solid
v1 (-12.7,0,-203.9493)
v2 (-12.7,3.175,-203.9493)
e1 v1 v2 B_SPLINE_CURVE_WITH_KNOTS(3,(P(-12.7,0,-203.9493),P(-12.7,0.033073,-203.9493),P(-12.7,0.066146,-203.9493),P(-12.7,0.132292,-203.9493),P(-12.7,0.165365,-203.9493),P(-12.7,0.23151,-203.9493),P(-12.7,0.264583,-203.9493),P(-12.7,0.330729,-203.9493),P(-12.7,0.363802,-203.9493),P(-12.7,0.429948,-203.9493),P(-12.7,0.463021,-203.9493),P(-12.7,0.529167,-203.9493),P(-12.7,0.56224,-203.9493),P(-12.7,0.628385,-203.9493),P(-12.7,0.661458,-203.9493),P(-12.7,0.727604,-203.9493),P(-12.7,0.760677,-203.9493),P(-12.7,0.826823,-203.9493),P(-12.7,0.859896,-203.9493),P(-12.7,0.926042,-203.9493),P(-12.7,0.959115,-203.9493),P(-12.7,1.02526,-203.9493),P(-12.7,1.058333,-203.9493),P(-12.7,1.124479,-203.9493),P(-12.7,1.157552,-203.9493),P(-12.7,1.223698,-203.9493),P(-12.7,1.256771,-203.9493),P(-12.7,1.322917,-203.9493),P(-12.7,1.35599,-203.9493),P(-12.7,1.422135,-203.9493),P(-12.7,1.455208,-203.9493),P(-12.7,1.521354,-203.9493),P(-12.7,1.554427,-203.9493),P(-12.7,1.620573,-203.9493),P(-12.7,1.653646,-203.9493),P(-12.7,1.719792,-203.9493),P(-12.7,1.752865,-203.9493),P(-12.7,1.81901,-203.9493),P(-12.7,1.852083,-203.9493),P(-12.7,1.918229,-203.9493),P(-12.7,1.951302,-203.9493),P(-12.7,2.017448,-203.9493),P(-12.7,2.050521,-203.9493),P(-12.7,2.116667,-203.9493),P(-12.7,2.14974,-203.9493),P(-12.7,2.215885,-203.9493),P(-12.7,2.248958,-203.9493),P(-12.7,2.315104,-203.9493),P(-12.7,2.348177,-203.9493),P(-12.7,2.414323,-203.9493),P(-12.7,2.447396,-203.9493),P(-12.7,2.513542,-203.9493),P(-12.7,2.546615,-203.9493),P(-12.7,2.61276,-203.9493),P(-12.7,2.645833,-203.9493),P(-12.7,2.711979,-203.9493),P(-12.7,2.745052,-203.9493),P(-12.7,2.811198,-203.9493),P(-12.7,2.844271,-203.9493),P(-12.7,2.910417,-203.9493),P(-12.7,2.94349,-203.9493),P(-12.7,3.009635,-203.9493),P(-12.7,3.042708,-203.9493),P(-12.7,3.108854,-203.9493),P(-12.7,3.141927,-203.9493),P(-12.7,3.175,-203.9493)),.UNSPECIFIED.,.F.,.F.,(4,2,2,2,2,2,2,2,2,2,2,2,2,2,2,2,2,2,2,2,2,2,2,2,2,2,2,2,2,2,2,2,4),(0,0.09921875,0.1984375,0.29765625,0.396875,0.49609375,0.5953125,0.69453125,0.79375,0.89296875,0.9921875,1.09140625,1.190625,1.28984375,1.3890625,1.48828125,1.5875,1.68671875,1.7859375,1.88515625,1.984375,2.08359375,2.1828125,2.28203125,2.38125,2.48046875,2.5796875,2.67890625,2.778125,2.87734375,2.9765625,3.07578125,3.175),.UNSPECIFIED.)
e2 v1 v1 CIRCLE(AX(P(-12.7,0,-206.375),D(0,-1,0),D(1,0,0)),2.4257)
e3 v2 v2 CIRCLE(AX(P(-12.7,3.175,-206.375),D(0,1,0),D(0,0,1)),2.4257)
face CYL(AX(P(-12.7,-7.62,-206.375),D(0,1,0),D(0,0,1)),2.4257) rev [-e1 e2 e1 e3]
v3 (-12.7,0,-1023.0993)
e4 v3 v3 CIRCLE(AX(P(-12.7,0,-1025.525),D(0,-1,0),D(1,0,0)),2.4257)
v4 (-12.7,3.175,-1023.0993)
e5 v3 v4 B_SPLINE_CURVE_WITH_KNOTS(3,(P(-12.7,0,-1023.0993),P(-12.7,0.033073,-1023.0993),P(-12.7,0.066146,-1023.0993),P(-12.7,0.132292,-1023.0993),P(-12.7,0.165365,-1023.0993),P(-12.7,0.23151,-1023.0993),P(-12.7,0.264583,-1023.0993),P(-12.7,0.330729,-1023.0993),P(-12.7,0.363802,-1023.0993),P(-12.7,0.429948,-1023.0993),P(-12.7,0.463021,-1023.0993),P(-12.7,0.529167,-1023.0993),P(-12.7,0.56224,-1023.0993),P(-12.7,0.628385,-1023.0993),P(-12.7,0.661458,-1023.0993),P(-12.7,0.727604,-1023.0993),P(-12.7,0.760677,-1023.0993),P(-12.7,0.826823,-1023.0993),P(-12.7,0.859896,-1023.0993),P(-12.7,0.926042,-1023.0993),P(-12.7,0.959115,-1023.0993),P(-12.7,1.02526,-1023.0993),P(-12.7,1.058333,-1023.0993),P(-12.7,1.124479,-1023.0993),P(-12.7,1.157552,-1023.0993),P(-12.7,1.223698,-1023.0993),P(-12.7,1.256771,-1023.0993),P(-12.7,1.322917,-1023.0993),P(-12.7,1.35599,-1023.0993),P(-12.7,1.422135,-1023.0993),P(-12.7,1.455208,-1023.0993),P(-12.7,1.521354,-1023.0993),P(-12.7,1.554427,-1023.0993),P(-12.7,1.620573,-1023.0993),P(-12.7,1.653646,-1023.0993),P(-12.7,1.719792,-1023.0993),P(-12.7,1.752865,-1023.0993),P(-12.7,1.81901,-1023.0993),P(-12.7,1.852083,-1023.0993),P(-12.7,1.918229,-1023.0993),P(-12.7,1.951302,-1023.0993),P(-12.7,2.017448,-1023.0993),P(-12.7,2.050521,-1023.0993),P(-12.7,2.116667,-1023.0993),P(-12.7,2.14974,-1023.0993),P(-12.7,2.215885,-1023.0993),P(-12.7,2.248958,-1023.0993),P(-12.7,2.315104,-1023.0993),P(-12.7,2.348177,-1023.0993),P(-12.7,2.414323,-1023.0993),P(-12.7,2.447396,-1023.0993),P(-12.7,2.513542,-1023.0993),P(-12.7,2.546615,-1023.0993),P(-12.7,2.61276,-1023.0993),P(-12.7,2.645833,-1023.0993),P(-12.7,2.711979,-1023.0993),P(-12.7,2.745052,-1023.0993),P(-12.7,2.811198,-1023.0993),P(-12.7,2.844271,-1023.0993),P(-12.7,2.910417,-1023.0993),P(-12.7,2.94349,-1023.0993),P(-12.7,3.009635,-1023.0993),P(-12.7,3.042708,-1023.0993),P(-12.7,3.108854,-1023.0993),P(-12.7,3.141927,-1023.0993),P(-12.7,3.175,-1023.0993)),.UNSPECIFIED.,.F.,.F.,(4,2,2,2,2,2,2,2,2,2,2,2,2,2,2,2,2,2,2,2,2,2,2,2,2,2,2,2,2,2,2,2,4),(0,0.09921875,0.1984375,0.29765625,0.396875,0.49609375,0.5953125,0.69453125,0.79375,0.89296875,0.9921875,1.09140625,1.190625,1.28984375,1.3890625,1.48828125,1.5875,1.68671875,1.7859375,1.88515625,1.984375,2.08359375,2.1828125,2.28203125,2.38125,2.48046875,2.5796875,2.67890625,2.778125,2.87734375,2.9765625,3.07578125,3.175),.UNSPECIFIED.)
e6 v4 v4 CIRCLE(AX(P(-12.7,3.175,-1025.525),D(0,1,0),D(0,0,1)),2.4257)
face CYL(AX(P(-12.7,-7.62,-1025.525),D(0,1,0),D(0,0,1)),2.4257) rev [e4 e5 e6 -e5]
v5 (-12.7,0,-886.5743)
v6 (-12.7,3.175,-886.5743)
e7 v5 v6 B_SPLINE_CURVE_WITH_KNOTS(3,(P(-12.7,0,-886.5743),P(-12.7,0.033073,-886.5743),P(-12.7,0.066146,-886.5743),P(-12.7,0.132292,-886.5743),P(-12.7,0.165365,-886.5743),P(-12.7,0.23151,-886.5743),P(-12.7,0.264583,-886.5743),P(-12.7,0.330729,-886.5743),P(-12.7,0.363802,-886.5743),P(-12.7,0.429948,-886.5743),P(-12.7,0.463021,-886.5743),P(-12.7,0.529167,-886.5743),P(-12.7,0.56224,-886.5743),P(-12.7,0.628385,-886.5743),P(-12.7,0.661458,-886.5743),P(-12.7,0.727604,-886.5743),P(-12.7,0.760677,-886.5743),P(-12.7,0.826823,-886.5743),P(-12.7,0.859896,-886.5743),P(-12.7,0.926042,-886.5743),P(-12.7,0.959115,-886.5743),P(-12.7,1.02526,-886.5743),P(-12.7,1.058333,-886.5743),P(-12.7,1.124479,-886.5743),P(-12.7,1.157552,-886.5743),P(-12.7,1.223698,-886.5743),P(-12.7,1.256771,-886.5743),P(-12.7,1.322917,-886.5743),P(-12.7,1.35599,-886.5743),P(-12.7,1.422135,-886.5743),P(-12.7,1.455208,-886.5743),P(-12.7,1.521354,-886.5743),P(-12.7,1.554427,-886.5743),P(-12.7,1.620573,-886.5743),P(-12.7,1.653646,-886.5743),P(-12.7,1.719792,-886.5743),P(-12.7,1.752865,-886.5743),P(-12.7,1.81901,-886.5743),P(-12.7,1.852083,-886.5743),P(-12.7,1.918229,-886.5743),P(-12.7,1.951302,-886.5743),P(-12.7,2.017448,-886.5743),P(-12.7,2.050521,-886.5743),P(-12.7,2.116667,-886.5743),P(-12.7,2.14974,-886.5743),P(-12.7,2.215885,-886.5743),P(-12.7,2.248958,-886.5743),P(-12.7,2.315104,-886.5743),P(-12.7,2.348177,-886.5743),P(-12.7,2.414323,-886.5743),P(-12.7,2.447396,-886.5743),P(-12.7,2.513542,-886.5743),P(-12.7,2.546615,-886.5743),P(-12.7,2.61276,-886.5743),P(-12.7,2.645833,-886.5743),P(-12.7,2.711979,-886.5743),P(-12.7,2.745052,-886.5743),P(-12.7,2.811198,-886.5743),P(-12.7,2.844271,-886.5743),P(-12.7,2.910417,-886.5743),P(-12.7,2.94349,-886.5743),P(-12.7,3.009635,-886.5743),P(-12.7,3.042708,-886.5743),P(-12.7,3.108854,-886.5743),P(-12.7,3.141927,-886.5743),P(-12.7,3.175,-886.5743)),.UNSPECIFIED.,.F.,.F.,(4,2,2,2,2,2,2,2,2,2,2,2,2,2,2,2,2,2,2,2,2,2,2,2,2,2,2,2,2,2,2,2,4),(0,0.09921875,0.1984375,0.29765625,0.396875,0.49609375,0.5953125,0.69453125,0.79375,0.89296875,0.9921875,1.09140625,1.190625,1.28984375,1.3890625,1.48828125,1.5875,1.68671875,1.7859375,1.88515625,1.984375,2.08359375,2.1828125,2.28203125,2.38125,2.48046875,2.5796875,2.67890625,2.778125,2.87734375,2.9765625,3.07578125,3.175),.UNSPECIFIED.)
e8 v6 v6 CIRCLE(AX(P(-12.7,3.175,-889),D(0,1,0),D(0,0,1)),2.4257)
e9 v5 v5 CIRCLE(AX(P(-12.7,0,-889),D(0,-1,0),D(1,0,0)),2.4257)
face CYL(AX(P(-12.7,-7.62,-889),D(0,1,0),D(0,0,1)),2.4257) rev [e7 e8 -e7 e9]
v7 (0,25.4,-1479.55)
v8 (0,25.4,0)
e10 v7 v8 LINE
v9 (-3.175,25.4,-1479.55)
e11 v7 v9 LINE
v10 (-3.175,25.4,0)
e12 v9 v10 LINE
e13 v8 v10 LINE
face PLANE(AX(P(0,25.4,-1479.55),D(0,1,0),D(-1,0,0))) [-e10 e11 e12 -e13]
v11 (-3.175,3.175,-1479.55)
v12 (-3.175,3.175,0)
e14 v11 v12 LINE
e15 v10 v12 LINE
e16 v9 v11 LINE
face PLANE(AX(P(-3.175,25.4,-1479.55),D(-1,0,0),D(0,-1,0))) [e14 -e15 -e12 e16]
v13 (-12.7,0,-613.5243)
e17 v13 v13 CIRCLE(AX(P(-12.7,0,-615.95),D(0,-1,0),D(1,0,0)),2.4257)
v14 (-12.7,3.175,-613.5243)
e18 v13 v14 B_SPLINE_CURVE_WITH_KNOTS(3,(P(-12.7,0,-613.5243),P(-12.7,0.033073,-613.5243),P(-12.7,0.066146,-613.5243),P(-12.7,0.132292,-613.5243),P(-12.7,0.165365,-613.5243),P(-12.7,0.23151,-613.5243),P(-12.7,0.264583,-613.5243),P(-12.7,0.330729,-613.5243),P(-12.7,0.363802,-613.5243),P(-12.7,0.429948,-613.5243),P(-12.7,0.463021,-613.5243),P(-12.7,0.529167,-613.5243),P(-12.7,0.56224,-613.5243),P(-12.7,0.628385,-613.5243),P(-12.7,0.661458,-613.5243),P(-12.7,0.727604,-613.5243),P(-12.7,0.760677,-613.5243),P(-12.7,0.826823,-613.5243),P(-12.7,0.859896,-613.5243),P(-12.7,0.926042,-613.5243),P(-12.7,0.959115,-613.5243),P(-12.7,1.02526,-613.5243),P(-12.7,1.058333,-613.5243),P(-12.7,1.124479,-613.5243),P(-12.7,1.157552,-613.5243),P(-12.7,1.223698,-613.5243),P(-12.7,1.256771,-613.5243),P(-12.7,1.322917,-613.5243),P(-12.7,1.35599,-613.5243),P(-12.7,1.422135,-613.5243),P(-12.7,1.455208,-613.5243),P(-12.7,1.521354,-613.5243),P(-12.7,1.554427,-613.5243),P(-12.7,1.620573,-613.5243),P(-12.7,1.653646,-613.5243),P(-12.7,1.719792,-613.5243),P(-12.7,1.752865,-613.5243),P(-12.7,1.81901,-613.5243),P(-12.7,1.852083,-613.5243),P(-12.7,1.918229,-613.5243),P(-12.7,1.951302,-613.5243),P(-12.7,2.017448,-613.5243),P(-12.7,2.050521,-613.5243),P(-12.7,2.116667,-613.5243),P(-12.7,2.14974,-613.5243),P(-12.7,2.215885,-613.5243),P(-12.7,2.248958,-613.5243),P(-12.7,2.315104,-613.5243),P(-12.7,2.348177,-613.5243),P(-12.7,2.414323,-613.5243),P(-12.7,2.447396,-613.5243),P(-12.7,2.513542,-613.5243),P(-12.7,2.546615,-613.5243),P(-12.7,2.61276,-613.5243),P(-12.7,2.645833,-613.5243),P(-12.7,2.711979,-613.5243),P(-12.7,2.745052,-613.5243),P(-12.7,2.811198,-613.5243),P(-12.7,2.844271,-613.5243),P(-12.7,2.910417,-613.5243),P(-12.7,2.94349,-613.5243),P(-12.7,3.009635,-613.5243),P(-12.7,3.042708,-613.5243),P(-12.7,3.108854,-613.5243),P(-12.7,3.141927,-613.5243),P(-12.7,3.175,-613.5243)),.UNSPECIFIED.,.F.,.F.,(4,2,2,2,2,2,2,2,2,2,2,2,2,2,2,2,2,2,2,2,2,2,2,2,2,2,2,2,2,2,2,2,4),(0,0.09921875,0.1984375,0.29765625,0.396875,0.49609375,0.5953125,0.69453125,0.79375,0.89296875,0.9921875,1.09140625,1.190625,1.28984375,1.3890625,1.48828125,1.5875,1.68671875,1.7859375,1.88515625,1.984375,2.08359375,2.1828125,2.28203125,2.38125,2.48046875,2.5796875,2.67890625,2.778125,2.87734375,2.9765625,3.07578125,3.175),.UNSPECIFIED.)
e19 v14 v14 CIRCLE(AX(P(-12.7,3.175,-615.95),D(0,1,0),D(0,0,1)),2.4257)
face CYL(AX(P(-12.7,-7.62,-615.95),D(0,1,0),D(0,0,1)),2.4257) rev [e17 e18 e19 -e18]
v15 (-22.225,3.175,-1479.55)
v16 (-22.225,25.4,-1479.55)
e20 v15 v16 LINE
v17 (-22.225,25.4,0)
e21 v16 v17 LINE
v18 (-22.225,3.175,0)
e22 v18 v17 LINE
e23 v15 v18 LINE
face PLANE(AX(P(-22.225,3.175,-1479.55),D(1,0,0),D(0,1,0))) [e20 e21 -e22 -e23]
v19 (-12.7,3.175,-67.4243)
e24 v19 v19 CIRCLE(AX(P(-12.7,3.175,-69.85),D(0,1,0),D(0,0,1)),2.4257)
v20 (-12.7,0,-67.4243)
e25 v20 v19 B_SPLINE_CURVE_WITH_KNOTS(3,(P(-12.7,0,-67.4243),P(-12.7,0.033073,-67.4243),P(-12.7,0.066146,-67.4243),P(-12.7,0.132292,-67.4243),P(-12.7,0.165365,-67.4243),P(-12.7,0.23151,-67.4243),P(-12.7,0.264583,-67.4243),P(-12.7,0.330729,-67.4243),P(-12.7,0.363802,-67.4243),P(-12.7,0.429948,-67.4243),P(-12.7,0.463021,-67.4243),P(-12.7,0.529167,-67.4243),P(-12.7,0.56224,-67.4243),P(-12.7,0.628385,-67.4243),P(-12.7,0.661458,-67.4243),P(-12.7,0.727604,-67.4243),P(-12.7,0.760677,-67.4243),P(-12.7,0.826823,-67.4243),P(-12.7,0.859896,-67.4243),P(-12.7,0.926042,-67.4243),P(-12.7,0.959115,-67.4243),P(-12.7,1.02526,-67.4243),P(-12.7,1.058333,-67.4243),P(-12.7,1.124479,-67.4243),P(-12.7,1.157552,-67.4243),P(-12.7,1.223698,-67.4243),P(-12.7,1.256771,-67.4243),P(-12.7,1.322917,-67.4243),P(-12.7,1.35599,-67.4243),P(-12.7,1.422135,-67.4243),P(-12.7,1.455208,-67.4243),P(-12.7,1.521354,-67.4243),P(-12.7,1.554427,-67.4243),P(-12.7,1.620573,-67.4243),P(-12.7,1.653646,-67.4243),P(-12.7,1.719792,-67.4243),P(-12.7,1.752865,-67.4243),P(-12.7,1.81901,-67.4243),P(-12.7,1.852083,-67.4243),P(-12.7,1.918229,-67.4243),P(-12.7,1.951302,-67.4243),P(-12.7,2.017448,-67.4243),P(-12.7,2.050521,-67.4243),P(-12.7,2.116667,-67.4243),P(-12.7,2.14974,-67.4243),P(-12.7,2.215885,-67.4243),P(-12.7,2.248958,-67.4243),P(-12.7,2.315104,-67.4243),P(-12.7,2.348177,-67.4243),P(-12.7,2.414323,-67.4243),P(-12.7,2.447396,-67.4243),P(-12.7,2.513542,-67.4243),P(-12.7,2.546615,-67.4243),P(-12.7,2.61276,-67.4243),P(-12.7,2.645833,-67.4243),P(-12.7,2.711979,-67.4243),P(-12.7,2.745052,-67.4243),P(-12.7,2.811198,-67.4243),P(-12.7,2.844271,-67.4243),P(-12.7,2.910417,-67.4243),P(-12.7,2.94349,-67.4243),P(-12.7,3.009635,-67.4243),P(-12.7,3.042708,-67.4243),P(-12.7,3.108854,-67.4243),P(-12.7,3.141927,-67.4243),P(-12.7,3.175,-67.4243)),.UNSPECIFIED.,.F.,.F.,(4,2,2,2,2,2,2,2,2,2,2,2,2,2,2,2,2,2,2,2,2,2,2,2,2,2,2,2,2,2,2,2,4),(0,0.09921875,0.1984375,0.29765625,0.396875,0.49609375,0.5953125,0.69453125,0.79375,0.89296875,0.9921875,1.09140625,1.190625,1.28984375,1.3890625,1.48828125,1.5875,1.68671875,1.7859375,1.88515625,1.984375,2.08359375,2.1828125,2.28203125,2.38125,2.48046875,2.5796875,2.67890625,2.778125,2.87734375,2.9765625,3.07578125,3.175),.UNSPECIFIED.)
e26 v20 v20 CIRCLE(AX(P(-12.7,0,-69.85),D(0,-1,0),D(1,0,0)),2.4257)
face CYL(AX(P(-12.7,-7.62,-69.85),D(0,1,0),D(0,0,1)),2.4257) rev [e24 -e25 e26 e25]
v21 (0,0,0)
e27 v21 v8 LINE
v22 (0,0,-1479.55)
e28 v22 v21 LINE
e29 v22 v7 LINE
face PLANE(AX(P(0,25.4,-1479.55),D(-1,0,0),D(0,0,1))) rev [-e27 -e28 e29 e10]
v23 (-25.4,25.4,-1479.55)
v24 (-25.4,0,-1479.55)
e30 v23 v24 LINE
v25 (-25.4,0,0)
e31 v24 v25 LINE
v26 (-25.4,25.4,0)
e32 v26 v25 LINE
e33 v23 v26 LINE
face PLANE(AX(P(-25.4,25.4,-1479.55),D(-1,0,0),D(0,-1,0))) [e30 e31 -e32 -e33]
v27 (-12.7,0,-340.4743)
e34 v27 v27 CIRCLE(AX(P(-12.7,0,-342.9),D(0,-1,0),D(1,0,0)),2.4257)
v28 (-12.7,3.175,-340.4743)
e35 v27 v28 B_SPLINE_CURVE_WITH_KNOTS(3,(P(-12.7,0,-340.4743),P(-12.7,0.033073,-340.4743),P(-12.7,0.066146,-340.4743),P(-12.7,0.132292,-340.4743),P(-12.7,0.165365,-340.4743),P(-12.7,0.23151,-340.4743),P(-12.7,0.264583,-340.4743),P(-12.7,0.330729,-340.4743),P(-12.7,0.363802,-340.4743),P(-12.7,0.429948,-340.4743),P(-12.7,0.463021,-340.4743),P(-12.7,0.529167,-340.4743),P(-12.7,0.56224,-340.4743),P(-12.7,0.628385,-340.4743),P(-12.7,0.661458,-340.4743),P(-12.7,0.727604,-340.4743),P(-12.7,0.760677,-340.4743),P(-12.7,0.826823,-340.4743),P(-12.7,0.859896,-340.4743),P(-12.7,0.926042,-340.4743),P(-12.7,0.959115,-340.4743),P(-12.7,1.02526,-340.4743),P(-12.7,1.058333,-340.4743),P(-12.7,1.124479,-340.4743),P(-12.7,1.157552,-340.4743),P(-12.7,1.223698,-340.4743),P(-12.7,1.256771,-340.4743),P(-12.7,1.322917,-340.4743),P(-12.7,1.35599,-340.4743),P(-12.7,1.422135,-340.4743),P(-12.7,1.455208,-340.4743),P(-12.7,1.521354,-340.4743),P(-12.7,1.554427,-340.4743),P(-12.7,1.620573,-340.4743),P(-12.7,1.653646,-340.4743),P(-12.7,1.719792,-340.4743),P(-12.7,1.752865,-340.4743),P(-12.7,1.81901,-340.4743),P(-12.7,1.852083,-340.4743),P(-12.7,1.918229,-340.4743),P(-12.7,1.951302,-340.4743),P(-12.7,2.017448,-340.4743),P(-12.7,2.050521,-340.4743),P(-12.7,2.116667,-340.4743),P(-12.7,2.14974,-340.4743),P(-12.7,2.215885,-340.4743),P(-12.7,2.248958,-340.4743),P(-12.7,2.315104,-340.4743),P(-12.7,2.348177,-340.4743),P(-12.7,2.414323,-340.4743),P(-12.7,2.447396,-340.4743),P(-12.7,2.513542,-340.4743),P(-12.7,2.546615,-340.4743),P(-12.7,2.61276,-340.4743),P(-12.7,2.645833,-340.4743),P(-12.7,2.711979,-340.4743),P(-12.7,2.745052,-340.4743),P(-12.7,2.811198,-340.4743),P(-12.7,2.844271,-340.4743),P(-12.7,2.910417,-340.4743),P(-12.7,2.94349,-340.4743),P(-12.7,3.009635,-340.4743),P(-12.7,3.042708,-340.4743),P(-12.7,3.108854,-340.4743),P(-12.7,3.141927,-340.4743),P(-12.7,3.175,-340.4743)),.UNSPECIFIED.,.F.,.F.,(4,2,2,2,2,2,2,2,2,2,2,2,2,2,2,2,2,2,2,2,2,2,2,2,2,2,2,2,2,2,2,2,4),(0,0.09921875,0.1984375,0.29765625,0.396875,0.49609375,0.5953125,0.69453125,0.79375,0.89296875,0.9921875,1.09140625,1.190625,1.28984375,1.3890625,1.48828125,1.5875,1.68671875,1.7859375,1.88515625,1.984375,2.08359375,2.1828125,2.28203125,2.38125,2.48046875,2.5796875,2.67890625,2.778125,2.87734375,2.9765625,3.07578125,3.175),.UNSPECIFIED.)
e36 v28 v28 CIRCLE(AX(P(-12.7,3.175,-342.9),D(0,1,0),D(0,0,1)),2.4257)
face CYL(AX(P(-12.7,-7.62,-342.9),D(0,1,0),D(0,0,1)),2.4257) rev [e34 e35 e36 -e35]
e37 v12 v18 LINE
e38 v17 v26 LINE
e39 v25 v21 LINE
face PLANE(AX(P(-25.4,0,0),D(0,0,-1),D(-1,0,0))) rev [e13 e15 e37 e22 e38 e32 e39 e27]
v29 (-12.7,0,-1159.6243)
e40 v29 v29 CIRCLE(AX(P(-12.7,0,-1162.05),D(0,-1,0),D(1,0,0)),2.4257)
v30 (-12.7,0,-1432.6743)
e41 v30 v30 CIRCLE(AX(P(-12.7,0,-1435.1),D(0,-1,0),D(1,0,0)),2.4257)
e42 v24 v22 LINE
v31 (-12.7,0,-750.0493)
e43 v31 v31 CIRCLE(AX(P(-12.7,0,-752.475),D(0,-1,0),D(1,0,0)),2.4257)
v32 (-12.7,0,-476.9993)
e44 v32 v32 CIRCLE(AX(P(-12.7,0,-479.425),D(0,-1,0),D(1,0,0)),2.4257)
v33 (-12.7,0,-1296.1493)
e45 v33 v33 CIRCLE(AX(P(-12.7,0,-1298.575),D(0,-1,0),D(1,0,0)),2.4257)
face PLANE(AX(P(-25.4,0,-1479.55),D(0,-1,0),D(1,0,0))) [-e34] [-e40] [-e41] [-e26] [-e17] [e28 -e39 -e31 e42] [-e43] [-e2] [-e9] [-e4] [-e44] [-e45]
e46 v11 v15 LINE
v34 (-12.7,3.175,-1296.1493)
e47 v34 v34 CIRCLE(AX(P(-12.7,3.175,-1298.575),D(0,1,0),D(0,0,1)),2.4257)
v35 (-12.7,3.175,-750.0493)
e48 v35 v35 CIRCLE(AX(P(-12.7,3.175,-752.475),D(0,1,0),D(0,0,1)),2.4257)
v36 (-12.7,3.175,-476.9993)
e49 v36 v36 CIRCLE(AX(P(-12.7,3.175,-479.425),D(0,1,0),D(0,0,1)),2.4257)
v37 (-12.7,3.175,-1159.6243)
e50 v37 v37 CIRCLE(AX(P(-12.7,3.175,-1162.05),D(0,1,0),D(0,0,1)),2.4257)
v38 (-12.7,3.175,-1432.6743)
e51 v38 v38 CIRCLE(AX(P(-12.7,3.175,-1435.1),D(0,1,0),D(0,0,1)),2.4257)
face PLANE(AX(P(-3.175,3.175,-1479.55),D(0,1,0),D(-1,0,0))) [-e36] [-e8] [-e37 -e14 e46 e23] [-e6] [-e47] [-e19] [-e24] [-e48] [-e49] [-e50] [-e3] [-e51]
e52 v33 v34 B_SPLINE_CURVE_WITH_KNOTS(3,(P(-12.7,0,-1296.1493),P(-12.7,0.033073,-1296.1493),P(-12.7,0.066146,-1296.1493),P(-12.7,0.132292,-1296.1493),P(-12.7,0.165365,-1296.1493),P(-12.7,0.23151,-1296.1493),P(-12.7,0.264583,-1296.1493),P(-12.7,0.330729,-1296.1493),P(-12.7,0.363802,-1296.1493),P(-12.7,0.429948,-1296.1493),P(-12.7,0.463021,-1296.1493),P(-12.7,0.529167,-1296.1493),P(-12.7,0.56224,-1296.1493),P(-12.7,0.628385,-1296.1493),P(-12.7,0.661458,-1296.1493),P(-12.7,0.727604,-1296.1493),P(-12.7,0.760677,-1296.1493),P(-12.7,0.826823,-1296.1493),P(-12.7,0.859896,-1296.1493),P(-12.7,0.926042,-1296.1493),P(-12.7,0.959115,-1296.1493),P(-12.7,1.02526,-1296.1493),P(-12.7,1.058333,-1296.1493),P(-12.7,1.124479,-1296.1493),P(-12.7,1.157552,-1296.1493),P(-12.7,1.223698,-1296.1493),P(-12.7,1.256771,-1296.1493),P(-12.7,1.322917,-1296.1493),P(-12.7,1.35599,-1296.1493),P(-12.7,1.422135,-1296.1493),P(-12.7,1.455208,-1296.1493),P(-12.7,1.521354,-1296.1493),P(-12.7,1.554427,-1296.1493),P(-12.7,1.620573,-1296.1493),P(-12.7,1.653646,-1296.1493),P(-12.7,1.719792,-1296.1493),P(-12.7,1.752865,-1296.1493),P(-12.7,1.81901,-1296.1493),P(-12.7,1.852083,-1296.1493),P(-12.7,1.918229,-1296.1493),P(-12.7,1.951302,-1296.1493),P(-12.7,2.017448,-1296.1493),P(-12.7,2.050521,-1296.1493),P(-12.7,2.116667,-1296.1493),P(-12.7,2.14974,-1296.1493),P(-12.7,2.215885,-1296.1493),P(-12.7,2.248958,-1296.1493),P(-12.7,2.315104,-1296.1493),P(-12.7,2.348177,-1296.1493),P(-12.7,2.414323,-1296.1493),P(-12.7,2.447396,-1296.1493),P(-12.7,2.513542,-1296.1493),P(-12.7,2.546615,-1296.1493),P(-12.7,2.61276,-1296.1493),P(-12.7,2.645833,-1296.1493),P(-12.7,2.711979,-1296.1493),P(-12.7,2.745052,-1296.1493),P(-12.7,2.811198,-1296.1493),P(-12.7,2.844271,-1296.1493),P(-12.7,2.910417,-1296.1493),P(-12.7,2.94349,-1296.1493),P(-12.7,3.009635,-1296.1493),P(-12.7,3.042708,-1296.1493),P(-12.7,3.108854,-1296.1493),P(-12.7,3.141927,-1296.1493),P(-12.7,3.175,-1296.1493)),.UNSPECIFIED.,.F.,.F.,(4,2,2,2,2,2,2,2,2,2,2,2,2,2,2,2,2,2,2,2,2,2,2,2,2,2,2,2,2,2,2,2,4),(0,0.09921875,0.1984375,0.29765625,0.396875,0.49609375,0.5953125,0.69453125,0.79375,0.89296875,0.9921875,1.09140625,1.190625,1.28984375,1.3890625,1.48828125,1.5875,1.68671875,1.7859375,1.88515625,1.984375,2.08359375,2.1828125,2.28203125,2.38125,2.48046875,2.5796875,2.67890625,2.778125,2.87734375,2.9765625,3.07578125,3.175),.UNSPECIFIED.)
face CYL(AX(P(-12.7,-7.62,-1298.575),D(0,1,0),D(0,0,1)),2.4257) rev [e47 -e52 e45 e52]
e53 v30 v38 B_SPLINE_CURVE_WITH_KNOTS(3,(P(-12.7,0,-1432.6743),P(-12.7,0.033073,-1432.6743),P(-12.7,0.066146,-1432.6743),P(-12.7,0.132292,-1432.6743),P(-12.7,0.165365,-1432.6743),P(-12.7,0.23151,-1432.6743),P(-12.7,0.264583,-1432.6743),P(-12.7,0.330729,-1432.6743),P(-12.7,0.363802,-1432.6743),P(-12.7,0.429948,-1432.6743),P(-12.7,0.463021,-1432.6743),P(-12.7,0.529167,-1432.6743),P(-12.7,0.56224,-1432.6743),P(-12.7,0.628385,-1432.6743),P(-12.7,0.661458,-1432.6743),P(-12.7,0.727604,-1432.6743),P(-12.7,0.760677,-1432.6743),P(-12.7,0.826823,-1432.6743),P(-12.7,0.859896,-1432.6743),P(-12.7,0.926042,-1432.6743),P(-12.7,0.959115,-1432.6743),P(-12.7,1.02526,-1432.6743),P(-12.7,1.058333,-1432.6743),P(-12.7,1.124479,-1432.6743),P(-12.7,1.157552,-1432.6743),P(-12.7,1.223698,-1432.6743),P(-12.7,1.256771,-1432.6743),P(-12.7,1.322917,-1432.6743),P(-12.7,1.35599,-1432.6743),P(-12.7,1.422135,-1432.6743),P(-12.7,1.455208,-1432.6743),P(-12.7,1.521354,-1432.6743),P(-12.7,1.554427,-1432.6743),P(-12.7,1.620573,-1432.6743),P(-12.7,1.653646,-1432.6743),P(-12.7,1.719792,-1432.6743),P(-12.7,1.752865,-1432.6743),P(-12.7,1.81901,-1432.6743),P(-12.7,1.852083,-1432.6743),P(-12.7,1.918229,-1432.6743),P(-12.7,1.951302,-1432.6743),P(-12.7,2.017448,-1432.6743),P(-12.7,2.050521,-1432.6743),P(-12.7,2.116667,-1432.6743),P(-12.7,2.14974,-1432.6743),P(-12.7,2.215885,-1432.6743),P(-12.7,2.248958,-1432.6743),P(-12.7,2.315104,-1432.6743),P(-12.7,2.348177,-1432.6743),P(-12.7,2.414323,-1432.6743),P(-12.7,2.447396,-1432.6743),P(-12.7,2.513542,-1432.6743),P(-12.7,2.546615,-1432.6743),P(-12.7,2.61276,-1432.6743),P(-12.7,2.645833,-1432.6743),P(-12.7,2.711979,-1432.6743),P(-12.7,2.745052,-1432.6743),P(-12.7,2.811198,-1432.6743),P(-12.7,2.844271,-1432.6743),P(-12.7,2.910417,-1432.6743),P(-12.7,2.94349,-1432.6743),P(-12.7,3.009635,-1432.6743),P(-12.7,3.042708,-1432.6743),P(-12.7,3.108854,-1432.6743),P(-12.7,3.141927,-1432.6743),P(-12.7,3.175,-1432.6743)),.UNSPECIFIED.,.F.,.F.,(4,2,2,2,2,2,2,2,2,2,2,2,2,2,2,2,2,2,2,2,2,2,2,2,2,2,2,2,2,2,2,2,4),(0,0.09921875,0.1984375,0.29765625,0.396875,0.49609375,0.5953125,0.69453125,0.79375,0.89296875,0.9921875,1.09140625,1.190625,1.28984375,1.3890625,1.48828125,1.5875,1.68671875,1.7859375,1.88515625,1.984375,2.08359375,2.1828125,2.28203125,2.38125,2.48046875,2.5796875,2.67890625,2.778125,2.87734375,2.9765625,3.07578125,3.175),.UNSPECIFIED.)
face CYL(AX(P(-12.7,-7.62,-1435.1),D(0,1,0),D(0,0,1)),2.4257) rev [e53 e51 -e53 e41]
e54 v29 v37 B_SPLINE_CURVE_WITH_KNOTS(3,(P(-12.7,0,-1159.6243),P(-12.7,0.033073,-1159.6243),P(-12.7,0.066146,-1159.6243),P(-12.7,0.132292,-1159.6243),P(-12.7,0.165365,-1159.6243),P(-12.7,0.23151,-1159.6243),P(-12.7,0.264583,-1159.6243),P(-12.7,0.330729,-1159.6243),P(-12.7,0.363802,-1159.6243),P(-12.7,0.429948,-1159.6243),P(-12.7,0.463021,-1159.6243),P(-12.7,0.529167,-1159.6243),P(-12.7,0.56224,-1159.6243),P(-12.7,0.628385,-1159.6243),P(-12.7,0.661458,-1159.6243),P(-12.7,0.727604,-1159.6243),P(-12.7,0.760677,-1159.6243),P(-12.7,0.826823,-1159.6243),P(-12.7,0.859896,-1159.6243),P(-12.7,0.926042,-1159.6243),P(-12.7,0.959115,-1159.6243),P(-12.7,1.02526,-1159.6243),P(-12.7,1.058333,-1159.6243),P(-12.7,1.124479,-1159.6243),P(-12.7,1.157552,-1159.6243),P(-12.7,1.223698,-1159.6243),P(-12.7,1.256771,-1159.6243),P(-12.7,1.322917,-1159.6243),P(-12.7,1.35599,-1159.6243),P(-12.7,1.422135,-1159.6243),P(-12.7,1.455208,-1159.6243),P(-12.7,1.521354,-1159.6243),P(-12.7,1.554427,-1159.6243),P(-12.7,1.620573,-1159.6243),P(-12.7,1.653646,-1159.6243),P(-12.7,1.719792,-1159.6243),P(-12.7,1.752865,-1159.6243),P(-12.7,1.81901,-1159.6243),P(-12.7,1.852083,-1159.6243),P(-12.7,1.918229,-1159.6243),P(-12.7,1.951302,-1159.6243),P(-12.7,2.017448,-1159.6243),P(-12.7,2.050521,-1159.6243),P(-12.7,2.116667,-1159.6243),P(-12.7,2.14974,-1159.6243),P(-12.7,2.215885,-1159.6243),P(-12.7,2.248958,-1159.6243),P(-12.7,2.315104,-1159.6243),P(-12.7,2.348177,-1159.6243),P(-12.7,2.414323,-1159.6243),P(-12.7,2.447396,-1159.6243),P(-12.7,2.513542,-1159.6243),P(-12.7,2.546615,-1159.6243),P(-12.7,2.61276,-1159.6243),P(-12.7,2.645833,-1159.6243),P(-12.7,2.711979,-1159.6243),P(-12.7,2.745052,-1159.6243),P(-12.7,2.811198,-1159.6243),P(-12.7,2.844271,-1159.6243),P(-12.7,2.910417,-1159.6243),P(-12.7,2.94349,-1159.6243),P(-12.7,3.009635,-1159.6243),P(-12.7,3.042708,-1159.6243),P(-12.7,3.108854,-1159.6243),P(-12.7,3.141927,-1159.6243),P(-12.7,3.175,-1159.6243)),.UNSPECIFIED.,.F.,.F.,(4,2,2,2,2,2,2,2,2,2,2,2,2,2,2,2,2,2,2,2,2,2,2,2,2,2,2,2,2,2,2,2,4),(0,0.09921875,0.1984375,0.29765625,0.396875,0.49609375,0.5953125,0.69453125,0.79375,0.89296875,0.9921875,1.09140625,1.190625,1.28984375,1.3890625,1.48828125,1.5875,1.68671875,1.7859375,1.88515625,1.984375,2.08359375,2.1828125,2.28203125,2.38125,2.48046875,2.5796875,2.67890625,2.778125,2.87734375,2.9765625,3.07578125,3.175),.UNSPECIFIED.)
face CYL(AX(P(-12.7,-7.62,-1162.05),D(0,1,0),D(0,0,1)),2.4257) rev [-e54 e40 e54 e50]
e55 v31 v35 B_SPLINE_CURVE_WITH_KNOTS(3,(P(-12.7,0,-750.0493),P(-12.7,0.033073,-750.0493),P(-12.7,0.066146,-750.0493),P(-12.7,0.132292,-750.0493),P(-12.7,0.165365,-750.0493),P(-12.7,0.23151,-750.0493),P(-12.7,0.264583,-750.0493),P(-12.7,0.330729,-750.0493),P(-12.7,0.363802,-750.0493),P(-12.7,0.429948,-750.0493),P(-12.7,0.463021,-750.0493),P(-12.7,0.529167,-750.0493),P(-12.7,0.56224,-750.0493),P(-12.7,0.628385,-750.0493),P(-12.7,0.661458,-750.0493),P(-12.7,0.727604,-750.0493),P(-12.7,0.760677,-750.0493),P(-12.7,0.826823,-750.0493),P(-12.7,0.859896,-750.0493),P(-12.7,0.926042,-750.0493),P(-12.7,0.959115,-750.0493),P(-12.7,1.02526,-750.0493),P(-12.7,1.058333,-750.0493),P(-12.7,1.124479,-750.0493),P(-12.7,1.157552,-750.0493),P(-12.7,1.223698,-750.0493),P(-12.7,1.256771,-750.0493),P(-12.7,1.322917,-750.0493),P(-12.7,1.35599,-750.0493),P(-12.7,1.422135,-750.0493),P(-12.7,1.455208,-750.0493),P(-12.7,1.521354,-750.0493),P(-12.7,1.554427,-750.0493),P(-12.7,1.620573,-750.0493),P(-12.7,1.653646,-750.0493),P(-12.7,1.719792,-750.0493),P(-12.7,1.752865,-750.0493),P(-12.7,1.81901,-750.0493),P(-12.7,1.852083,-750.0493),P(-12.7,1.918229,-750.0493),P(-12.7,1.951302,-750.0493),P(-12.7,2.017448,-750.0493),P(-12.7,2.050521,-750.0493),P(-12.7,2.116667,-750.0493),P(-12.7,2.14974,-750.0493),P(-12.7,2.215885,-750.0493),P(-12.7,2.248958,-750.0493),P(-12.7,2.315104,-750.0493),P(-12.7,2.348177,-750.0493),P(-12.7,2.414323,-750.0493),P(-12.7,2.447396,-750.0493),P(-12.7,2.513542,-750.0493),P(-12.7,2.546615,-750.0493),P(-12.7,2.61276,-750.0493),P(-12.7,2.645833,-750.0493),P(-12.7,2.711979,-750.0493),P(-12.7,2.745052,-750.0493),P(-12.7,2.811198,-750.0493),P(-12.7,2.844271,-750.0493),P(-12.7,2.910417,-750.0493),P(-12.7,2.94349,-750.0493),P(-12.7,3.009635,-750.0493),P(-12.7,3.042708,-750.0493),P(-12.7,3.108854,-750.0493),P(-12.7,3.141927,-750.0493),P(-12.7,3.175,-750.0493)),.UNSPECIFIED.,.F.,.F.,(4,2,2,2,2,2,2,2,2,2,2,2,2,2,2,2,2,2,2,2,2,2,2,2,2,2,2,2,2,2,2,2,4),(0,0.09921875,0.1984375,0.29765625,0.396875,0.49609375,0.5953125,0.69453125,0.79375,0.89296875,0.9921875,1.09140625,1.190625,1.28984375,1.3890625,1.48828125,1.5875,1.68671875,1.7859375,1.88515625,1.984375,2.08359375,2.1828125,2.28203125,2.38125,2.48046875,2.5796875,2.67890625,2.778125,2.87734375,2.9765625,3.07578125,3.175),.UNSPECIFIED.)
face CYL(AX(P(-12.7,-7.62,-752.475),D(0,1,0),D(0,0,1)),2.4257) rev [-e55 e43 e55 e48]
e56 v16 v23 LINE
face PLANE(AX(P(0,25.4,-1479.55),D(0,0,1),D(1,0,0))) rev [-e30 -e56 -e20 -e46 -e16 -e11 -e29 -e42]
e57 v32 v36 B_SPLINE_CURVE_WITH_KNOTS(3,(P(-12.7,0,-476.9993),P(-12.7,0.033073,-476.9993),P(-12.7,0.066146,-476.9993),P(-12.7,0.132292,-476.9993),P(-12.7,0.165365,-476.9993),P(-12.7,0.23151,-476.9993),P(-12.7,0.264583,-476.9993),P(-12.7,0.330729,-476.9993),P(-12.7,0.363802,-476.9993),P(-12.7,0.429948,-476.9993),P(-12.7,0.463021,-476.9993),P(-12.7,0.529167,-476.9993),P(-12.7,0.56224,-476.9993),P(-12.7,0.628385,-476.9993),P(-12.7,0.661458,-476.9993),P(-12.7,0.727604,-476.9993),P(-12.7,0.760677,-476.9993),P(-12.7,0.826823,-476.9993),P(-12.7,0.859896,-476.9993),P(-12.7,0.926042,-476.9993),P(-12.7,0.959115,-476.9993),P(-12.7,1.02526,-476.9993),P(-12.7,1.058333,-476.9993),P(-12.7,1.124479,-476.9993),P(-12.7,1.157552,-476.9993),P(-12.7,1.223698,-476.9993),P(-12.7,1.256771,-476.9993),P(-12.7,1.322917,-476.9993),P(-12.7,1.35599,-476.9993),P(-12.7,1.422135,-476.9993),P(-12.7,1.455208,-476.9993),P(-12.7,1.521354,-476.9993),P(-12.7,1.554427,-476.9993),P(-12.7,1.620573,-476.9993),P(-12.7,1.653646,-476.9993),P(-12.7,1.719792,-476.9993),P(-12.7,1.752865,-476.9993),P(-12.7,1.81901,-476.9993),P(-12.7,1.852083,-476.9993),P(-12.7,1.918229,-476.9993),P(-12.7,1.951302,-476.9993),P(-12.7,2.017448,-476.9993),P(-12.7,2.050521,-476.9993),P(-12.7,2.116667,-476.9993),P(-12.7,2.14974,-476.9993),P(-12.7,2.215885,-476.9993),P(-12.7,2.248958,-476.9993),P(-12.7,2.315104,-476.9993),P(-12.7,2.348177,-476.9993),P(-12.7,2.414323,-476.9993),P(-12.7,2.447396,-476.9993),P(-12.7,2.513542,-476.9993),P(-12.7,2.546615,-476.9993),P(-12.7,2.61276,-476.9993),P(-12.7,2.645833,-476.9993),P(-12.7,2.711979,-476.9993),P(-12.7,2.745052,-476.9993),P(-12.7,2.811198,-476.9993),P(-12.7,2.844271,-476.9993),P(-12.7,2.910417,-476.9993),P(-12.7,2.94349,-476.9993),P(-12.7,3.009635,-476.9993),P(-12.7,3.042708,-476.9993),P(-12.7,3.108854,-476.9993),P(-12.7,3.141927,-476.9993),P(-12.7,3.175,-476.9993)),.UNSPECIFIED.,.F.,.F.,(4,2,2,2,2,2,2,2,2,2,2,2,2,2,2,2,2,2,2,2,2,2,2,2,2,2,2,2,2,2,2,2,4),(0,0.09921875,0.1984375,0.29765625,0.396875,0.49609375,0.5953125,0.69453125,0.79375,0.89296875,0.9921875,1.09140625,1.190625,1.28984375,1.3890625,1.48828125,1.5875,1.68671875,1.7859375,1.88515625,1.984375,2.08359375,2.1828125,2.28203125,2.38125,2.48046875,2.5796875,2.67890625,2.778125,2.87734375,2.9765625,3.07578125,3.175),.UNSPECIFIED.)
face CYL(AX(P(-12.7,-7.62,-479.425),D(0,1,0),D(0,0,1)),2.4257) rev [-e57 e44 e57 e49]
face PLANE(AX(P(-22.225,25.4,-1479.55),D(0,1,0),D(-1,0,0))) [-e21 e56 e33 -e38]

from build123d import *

# Parameters (mm, degrees)
LOFT1_START        = -1479.55
LOFT1_DEPTH        = 1479.55
SKETCH3_R          = 2.4257
CUT_EXTRUDE1_DEPTH = 7.62
LPATTERN1_COUNT    = 11
LPATTERN1_PITCH    = 136.525


# Read off the part's stored shape, not the designer's step: Loft1
with BuildPart() as part:
    # Loft1 outline → Loft1 (new body)
    with BuildSketch(Plane.XY.offset(LOFT1_START)):
        Polygon((0, 0), (0, 25.4), (-3.175, 25.4), (-3.175, 3.175), (-22.225, 3.175), (-22.225, 25.4), (-25.4, 25.4), (-25.4, 0), align=None)
    extrude(amount=LOFT1_DEPTH)

    # Sketch3 → Cut-Extrude1 (cut, symmetric)
    with BuildSketch(Plane(origin=(0, 0, 0), x_dir=(1, 0, 0), z_dir=(0, 1, 0))):
        with Locations(Location((-12.7, 69.85, 0), (0, 0, 270))):
            Circle(SKETCH3_R)
    cut_extrude1 = extrude(amount=CUT_EXTRUDE1_DEPTH, both=True, mode=Mode.SUBTRACT)

    # LPattern1: Cut-Extrude1 ×11
    with Locations(*[(0, 0, -i * LPATTERN1_PITCH) for i in range(1, LPATTERN1_COUNT)]):
        add(cut_extrude1, mode=Mode.SUBTRACT)


solid = part.part
